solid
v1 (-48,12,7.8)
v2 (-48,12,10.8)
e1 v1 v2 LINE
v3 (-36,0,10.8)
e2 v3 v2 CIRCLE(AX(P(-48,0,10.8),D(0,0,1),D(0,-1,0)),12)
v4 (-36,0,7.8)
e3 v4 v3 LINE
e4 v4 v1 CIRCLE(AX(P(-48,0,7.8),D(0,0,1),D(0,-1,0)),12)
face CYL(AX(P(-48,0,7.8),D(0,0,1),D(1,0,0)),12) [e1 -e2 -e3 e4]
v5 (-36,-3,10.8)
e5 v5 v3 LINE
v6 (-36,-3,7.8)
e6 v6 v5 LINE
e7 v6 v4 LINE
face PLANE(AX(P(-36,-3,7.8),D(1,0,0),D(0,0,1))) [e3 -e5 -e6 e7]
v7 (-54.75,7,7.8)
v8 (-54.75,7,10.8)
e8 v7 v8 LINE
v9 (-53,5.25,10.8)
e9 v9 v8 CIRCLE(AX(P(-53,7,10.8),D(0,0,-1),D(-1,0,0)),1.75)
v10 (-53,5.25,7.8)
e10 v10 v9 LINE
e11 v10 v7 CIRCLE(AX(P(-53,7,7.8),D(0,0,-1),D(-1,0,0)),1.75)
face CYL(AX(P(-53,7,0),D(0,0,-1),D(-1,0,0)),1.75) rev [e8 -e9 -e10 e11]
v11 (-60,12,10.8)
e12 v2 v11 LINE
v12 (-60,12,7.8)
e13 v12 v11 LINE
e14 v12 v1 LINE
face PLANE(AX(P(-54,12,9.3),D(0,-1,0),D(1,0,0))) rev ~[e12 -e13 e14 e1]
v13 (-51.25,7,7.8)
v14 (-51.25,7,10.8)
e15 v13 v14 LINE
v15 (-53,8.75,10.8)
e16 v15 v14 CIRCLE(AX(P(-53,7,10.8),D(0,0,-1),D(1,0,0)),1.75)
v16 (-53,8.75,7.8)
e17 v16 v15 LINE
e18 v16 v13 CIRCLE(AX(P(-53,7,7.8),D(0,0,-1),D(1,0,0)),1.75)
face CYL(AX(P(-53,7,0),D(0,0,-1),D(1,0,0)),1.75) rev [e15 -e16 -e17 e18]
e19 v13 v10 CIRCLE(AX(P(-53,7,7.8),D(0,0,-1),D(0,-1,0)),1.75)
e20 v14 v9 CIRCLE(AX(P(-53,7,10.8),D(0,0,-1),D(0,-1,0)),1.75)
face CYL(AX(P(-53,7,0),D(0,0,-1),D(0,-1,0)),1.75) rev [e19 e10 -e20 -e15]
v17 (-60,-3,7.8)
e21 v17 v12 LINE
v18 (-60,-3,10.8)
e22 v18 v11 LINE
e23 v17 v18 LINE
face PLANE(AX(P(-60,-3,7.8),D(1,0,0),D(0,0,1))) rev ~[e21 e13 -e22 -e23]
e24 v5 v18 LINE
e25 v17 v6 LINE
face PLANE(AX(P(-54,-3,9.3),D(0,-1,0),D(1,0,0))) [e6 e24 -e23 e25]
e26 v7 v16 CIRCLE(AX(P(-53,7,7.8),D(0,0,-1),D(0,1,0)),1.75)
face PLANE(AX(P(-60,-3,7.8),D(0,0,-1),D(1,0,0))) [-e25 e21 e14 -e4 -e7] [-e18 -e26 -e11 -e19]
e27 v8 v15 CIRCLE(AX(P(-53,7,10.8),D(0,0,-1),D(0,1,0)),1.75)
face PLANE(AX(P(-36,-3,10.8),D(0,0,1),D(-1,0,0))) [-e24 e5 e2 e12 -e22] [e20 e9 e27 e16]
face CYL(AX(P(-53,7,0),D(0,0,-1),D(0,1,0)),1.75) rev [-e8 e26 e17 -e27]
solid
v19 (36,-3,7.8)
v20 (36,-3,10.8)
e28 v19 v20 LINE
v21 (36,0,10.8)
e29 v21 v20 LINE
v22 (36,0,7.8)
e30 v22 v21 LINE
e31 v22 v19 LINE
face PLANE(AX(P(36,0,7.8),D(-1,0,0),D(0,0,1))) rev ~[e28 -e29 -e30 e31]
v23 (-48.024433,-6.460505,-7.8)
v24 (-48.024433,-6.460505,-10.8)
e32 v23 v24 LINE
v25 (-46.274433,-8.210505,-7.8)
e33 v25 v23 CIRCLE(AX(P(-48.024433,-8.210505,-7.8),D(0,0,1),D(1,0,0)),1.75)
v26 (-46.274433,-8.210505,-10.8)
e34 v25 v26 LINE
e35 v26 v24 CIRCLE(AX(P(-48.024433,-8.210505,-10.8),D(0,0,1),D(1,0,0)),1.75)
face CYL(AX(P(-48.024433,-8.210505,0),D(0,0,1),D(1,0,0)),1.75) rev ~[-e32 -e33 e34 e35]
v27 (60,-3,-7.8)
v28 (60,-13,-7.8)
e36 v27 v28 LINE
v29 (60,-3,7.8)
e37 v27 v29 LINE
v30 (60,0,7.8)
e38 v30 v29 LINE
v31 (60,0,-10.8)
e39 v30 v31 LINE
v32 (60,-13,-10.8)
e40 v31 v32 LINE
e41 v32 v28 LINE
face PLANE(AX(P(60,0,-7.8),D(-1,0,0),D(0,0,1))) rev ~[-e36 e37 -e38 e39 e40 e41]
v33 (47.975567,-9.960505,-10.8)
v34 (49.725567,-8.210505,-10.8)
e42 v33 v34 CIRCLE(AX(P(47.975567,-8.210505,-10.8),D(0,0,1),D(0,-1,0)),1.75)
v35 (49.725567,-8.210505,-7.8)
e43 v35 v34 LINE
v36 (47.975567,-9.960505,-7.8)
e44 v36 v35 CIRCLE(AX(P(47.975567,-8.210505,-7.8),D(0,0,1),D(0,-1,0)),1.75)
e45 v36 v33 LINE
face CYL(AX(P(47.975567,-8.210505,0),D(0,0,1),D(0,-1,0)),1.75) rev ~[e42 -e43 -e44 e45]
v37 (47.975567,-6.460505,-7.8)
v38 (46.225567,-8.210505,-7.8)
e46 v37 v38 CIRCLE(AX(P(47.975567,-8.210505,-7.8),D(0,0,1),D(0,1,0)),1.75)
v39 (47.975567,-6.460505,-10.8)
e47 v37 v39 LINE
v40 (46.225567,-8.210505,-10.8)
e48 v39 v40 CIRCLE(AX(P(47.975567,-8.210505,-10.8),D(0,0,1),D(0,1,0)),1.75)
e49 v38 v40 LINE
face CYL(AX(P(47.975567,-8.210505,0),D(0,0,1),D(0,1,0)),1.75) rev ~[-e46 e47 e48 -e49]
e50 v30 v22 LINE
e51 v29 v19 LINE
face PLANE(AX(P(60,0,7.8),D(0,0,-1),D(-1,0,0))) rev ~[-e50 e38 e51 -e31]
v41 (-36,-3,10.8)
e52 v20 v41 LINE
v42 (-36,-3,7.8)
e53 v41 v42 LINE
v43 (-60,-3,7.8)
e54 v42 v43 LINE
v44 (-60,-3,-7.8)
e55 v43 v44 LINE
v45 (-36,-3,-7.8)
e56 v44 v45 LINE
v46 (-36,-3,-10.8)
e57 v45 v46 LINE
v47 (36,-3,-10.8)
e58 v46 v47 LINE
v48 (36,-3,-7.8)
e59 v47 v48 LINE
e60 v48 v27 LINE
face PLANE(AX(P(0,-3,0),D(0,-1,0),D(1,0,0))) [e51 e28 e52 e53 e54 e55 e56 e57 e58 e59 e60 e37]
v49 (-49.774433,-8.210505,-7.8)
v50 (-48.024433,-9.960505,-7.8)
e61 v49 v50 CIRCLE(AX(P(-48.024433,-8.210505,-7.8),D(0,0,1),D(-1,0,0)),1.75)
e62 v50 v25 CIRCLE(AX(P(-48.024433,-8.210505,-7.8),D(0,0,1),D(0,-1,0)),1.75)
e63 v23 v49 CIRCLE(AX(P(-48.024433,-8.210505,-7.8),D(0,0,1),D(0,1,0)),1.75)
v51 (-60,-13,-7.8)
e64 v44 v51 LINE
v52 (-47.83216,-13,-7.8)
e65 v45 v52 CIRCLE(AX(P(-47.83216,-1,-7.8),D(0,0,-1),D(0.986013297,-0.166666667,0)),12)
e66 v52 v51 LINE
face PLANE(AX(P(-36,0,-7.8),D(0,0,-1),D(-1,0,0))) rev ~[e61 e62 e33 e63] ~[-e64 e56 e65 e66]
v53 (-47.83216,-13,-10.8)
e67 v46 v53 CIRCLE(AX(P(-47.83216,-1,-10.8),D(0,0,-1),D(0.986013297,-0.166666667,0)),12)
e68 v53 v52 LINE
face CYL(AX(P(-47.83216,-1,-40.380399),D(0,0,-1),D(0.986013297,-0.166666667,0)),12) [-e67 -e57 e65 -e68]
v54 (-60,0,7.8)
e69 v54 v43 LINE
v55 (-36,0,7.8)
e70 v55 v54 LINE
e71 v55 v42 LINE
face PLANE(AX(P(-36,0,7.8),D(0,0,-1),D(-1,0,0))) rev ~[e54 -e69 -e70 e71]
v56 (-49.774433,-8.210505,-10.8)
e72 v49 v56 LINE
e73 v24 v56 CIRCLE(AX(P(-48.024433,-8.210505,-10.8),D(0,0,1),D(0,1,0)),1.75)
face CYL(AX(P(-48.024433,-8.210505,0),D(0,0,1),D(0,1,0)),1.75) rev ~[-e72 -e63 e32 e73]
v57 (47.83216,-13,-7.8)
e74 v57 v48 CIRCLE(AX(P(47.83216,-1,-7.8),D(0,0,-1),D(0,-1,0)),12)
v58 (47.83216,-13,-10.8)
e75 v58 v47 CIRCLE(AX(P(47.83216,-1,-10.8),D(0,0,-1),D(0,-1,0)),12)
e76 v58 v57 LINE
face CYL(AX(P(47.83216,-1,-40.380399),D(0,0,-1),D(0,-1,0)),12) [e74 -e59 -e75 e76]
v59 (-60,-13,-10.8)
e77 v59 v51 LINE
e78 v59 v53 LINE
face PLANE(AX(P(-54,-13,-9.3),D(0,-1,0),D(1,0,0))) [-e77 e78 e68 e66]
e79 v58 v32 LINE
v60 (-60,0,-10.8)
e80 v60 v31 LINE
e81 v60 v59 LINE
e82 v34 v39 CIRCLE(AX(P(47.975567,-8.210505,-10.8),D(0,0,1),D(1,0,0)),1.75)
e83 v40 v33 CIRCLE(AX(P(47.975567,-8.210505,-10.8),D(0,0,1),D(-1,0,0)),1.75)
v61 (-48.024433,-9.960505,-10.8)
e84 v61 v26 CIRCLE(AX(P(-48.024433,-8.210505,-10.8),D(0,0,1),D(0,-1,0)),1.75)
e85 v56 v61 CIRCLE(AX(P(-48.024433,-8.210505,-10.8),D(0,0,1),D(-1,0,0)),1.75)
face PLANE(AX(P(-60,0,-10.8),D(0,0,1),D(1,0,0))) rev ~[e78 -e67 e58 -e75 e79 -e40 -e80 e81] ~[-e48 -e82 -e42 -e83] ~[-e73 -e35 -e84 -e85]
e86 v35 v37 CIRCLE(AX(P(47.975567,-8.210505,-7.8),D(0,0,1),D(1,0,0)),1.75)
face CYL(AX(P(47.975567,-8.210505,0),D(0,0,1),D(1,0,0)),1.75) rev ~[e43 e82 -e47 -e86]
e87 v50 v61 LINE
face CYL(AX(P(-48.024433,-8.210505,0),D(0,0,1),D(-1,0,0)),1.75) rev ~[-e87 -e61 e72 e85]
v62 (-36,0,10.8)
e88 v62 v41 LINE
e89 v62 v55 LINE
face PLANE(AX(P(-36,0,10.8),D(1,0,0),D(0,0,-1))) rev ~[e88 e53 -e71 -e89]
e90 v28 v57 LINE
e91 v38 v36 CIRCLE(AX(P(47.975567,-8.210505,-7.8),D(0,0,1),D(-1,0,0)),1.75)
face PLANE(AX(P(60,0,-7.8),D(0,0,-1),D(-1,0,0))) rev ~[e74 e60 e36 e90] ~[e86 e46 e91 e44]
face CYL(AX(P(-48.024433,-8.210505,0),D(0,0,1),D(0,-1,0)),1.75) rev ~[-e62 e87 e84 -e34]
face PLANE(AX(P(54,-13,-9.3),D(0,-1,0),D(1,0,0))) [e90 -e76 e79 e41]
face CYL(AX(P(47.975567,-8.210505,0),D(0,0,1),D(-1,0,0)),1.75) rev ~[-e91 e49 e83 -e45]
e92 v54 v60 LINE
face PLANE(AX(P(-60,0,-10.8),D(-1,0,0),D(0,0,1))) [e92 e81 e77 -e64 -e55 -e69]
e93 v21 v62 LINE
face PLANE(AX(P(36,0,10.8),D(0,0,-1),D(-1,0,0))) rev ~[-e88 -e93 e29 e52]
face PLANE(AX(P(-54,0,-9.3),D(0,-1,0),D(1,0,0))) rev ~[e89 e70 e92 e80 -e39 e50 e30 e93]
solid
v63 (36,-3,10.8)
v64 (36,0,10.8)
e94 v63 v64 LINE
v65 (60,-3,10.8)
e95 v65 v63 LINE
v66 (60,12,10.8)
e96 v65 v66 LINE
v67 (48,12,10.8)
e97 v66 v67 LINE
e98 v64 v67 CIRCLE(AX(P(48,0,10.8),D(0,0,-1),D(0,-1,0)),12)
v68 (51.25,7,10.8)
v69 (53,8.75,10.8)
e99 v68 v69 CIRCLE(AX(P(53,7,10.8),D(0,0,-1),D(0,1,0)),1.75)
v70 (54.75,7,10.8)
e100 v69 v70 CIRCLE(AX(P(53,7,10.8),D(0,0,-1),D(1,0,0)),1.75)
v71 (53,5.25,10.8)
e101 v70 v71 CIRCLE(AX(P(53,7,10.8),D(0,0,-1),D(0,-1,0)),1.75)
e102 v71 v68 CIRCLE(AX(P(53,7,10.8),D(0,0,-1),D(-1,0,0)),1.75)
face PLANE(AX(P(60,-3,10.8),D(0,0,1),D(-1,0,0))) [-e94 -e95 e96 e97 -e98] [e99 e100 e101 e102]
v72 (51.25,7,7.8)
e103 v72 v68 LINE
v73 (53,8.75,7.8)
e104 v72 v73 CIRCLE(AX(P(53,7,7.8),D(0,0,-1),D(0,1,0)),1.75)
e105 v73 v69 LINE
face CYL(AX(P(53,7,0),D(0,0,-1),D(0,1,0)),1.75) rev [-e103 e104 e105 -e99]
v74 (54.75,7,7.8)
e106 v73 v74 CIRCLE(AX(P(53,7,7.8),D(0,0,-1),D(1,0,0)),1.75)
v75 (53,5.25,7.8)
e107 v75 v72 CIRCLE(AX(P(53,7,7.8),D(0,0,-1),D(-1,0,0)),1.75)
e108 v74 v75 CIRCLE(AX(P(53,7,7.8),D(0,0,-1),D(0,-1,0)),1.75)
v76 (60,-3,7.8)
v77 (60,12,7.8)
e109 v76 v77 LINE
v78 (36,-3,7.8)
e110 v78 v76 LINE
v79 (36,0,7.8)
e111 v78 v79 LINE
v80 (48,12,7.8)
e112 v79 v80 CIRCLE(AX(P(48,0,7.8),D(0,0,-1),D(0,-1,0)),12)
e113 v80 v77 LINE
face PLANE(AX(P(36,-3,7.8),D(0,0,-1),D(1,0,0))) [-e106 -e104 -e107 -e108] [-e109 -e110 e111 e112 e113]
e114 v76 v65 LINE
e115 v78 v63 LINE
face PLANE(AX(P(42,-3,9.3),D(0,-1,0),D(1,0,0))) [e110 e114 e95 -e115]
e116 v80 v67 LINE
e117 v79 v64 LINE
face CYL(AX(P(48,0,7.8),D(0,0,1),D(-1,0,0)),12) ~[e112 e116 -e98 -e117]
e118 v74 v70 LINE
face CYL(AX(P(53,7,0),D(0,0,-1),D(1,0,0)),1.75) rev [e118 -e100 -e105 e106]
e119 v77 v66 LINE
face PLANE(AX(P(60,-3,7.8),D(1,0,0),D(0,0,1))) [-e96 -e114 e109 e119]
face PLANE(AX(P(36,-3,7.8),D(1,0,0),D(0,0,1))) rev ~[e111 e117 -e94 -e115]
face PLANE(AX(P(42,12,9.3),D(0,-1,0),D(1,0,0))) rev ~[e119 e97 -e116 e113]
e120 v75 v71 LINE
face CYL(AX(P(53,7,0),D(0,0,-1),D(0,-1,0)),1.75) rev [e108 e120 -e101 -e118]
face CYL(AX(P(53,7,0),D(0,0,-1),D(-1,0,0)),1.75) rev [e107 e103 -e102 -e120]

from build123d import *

# Parameters (mm, degrees)
F1_DEPTH    = 3
F0_W        = 12
F0_H        = 3
F2_DEPTH    = 13
F3_T1_DEPTH = 62.160797831
F4_T1_DEPTH = 62.160797831
F5_DEPTH    = 15
F7_R        = 12
F7_2_R      = 12
F9_DEPTH    = 25
F11_DEPTH   = 25


# Not quite as in the source:
# - a fillet or chamfer that OpenCascade refuses, or shapes differently, is made with other operations: its cross-section is extruded or revolved along the edge and cut away or added


with BuildPart() as f1:
    # F0 (on Front) → F1 (new body)
    with BuildSketch(Plane.XZ):
        Polygon((-48, 7.8), (-60, 7.8), (-60, -7.8), (-48, -7.8), (-36, -7.8), (-36, -10.8), (36, -10.8), (36, -7.8), (48, -7.8), (60, -7.8), (60, 7.8), (48, 7.8), (36, 7.8), (36, 10.8), (-36, 10.8), (-36, 7.8), align=None)
    extrude(amount=F1_DEPTH)

    # F0 (on Front) → F2 (join)
    with BuildSketch(Plane.XZ):
        with Locations((-54, -9.3)):
            Rectangle(F0_W, F0_H)
        with Locations((54, -9.3)):
            Rectangle(F0_W, F0_H)
        with Locations((-42, -9.3)):
            Rectangle(F0_W, F0_H)
        with Locations((42, -9.3)):
            Rectangle(F0_W, F0_H)
    extrude(amount=F2_DEPTH)

    # F3: fillet of radius 12 on 1 edges, made by hand

    # F3_s2 → F3_t1 (cut)
    with BuildSketch(Plane.XY.offset(-40.3803989155)):
        with BuildLine():
            ThreePointArc((-36, -3), (-40.0861928738, -10.1651513899), (-47.8321595662, -13))
            Line((-47.8321595662, -13), (-36, -13))
            Line((-36, -13), (-36, -3))
        make_face()
    extrude(amount=F3_T1_DEPTH, mode=Mode.SUBTRACT)

    # F4: fillet of radius 12 on 1 edges, made by hand

    # F4_s2 → F4_t1 (cut)
    with BuildSketch(Plane.XY.offset(-40.3803989155)):
        with BuildLine():
            ThreePointArc((47.8321595662, -13), (40.0861928738, -10.1651513899), (36, -3))
            Line((36, -3), (36, -13))
            Line((36, -13), (47.8321595662, -13))
        make_face()
    extrude(amount=F4_T1_DEPTH, mode=Mode.SUBTRACT)


with BuildPart() as f5:
    # F0 (on Front) → F5 (new body)
    with BuildSketch(Plane.XZ):
        with Locations((-54, 9.3)):
            Rectangle(F0_W, F0_H)
        with Locations((-42, 9.3)):
            Rectangle(F0_W, F0_H)
    extrude(amount=-F5_DEPTH)


with BuildPart() as f5b:
    # F0 (on Front) → F5, piece 2 (new body)
    with BuildSketch(Plane.XZ):
        with Locations((42, 9.3)):
            Rectangle(F0_W, F0_H)
        with Locations((54, 9.3)):
            Rectangle(F0_W, F0_H)
    extrude(amount=-F5_DEPTH)


with BuildPart() as f5_1:
    # F6: moved
    add(f5.part.moved(Location((0, -3, 0))))

    # F7
    f7_edges = [f5_1.edges().sort_by_distance(p)[0] for p in [
        (-36, 12, 9.3),
    ]]
    fillet(f7_edges, radius=F7_R)


with BuildPart() as f5b_1:
    # F6: moved
    add(f5b.part.moved(Location((0, -3, 0))))

    # F7#2
    f7_2_edges = [f5b_1.edges().sort_by_distance(p)[0] for p in [
        (36, 12, 9.3),
    ]]
    fillet(f7_2_edges, radius=F7_2_R)


with BuildPart() as f9:
    # F8 (on Top) → F9 (new body)
    with BuildSketch(Plane.XY):
        with BuildLine():
            ThreePointArc((-53, 8.75), (-54.2374368671, 8.2374368671), (-54.75, 7))
            Line((-54.75, 7), (-53, 7))
            Line((-53, 7), (-53, 8.75))
        make_face()
        with BuildLine():
            Line((-53, 8.75), (-53, 7))
            Line((-53, 7), (-51.25, 7))
            ThreePointArc((-51.25, 7), (-51.7625631329, 8.2374368671), (-53, 8.75))
        make_face()
        with BuildLine():
            Line((-53, 7), (-53, 5.25))
            ThreePointArc((-53, 5.25), (-51.7625631329, 5.7625631329), (-51.25, 7))
            Line((-51.25, 7), (-53, 7))
        make_face()
        with BuildLine():
            ThreePointArc((-54.75, 7), (-54.2374368671, 5.7625631329), (-53, 5.25))
            Line((-53, 5.25), (-53, 7))
            Line((-53, 7), (-54.75, 7))
        make_face()
    extrude(amount=F9_DEPTH)


with BuildPart() as f9b:
    # F8 (on Top) → F9, piece 2 (new body)
    with BuildSketch(Plane.XY):
        with BuildLine():
            ThreePointArc((51.25, 7), (51.7625631329, 5.7625631329), (53, 5.25))
            Line((53, 5.25), (53, 7))
            Line((53, 7), (51.25, 7))
        make_face()
        with BuildLine():
            Line((53, 7), (53, 5.25))
            ThreePointArc((53, 5.25), (54.2374368671, 5.7625631329), (54.75, 7))
            Line((54.75, 7), (53, 7))
        make_face()
        with BuildLine():
            Line((53, 8.75), (53, 7))
            Line((53, 7), (54.75, 7))
            ThreePointArc((54.75, 7), (54.2374368671, 8.2374368671), (53, 8.75))
        make_face()
        with BuildLine():
            Line((51.25, 7), (53, 7))
            Line((53, 7), (53, 8.75))
            ThreePointArc((53, 8.75), (51.7625631329, 8.2374368671), (51.25, 7))
        make_face()
    extrude(amount=F9_DEPTH)


with BuildPart() as f5_2:
    add(f5_1.part)

    # F10: cut F9, F9b
    add(f9.part, mode=Mode.SUBTRACT)
    add(f9b.part, mode=Mode.SUBTRACT)


with BuildPart() as f5b_2:
    add(f5b_1.part)

    # F10: cut F9, F9b
    add(f9.part, mode=Mode.SUBTRACT)
    add(f9b.part, mode=Mode.SUBTRACT)


with BuildPart() as f11:
    # F8 (on Top) → F11 (new body)
    with BuildSketch(Plane.XY):
        with BuildLine():
            ThreePointArc((-46.274432838, -8.2105052471), (-46.7869959709, -6.97306838), (-48.024432838, -6.4605052471))
            Line((-48.024432838, -6.4605052471), (-48.024432838, -8.2105052471))
            Line((-48.024432838, -8.2105052471), (-46.274432838, -8.2105052471))
        make_face()
        with BuildLine():
            Line((-48.024432838, -8.2105052471), (-48.024432838, -6.4605052471))
            ThreePointArc((-48.024432838, -6.4605052471), (-49.261869705, -6.97306838), (-49.774432838, -8.2105052471))
            Line((-49.774432838, -8.2105052471), (-48.024432838, -8.2105052471))
        make_face()
        with BuildLine():
            Line((-48.024432838, -8.2105052471), (-49.774432838, -8.2105052471))
            ThreePointArc((-49.774432838, -8.2105052471), (-49.261869705, -9.4479421142), (-48.024432838, -9.9605052471))
            Line((-48.024432838, -9.9605052471), (-48.024432838, -8.2105052471))
        make_face()
        with BuildLine():
            Line((-46.274432838, -8.2105052471), (-48.024432838, -8.2105052471))
            Line((-48.024432838, -8.2105052471), (-48.024432838, -9.9605052471))
            ThreePointArc((-48.024432838, -9.9605052471), (-46.7869959709, -9.4479421142), (-46.274432838, -8.2105052471))
        make_face()
    extrude(amount=-F11_DEPTH)


with BuildPart() as f11b:
    # F8 (on Top) → F11, piece 2 (new body)
    with BuildSketch(Plane.XY):
        with BuildLine():
            ThreePointArc((49.725567162, -8.2105052471), (49.2130040291, -6.97306838), (47.975567162, -6.4605052471))
            Line((47.975567162, -6.4605052471), (47.975567162, -8.2105052471))
            Line((47.975567162, -8.2105052471), (49.725567162, -8.2105052471))
        make_face()
        with BuildLine():
            Line((47.975567162, -8.2105052471), (47.975567162, -6.4605052471))
            ThreePointArc((47.975567162, -6.4605052471), (46.738130295, -6.97306838), (46.225567162, -8.2105052471))
            Line((46.225567162, -8.2105052471), (47.975567162, -8.2105052471))
        make_face()
        with BuildLine():
            Line((47.975567162, -9.9605052471), (47.975567162, -8.2105052471))
            Line((47.975567162, -8.2105052471), (46.225567162, -8.2105052471))
            ThreePointArc((46.225567162, -8.2105052471), (46.738130295, -9.4479421142), (47.975567162, -9.9605052471))
        make_face()
        with BuildLine():
            Line((49.725567162, -8.2105052471), (47.975567162, -8.2105052471))
            Line((47.975567162, -8.2105052471), (47.975567162, -9.9605052471))
            ThreePointArc((47.975567162, -9.9605052471), (49.2130040291, -9.4479421142), (49.725567162, -8.2105052471))
        make_face()
    extrude(amount=-F11_DEPTH)


with BuildPart() as f1_1:
    add(f1.part)

    # F12: cut F11, F11b
    add(f11.part, mode=Mode.SUBTRACT)
    add(f11b.part, mode=Mode.SUBTRACT)


solid = Compound([f5_2.part, f5b_2.part, f1_1.part])
